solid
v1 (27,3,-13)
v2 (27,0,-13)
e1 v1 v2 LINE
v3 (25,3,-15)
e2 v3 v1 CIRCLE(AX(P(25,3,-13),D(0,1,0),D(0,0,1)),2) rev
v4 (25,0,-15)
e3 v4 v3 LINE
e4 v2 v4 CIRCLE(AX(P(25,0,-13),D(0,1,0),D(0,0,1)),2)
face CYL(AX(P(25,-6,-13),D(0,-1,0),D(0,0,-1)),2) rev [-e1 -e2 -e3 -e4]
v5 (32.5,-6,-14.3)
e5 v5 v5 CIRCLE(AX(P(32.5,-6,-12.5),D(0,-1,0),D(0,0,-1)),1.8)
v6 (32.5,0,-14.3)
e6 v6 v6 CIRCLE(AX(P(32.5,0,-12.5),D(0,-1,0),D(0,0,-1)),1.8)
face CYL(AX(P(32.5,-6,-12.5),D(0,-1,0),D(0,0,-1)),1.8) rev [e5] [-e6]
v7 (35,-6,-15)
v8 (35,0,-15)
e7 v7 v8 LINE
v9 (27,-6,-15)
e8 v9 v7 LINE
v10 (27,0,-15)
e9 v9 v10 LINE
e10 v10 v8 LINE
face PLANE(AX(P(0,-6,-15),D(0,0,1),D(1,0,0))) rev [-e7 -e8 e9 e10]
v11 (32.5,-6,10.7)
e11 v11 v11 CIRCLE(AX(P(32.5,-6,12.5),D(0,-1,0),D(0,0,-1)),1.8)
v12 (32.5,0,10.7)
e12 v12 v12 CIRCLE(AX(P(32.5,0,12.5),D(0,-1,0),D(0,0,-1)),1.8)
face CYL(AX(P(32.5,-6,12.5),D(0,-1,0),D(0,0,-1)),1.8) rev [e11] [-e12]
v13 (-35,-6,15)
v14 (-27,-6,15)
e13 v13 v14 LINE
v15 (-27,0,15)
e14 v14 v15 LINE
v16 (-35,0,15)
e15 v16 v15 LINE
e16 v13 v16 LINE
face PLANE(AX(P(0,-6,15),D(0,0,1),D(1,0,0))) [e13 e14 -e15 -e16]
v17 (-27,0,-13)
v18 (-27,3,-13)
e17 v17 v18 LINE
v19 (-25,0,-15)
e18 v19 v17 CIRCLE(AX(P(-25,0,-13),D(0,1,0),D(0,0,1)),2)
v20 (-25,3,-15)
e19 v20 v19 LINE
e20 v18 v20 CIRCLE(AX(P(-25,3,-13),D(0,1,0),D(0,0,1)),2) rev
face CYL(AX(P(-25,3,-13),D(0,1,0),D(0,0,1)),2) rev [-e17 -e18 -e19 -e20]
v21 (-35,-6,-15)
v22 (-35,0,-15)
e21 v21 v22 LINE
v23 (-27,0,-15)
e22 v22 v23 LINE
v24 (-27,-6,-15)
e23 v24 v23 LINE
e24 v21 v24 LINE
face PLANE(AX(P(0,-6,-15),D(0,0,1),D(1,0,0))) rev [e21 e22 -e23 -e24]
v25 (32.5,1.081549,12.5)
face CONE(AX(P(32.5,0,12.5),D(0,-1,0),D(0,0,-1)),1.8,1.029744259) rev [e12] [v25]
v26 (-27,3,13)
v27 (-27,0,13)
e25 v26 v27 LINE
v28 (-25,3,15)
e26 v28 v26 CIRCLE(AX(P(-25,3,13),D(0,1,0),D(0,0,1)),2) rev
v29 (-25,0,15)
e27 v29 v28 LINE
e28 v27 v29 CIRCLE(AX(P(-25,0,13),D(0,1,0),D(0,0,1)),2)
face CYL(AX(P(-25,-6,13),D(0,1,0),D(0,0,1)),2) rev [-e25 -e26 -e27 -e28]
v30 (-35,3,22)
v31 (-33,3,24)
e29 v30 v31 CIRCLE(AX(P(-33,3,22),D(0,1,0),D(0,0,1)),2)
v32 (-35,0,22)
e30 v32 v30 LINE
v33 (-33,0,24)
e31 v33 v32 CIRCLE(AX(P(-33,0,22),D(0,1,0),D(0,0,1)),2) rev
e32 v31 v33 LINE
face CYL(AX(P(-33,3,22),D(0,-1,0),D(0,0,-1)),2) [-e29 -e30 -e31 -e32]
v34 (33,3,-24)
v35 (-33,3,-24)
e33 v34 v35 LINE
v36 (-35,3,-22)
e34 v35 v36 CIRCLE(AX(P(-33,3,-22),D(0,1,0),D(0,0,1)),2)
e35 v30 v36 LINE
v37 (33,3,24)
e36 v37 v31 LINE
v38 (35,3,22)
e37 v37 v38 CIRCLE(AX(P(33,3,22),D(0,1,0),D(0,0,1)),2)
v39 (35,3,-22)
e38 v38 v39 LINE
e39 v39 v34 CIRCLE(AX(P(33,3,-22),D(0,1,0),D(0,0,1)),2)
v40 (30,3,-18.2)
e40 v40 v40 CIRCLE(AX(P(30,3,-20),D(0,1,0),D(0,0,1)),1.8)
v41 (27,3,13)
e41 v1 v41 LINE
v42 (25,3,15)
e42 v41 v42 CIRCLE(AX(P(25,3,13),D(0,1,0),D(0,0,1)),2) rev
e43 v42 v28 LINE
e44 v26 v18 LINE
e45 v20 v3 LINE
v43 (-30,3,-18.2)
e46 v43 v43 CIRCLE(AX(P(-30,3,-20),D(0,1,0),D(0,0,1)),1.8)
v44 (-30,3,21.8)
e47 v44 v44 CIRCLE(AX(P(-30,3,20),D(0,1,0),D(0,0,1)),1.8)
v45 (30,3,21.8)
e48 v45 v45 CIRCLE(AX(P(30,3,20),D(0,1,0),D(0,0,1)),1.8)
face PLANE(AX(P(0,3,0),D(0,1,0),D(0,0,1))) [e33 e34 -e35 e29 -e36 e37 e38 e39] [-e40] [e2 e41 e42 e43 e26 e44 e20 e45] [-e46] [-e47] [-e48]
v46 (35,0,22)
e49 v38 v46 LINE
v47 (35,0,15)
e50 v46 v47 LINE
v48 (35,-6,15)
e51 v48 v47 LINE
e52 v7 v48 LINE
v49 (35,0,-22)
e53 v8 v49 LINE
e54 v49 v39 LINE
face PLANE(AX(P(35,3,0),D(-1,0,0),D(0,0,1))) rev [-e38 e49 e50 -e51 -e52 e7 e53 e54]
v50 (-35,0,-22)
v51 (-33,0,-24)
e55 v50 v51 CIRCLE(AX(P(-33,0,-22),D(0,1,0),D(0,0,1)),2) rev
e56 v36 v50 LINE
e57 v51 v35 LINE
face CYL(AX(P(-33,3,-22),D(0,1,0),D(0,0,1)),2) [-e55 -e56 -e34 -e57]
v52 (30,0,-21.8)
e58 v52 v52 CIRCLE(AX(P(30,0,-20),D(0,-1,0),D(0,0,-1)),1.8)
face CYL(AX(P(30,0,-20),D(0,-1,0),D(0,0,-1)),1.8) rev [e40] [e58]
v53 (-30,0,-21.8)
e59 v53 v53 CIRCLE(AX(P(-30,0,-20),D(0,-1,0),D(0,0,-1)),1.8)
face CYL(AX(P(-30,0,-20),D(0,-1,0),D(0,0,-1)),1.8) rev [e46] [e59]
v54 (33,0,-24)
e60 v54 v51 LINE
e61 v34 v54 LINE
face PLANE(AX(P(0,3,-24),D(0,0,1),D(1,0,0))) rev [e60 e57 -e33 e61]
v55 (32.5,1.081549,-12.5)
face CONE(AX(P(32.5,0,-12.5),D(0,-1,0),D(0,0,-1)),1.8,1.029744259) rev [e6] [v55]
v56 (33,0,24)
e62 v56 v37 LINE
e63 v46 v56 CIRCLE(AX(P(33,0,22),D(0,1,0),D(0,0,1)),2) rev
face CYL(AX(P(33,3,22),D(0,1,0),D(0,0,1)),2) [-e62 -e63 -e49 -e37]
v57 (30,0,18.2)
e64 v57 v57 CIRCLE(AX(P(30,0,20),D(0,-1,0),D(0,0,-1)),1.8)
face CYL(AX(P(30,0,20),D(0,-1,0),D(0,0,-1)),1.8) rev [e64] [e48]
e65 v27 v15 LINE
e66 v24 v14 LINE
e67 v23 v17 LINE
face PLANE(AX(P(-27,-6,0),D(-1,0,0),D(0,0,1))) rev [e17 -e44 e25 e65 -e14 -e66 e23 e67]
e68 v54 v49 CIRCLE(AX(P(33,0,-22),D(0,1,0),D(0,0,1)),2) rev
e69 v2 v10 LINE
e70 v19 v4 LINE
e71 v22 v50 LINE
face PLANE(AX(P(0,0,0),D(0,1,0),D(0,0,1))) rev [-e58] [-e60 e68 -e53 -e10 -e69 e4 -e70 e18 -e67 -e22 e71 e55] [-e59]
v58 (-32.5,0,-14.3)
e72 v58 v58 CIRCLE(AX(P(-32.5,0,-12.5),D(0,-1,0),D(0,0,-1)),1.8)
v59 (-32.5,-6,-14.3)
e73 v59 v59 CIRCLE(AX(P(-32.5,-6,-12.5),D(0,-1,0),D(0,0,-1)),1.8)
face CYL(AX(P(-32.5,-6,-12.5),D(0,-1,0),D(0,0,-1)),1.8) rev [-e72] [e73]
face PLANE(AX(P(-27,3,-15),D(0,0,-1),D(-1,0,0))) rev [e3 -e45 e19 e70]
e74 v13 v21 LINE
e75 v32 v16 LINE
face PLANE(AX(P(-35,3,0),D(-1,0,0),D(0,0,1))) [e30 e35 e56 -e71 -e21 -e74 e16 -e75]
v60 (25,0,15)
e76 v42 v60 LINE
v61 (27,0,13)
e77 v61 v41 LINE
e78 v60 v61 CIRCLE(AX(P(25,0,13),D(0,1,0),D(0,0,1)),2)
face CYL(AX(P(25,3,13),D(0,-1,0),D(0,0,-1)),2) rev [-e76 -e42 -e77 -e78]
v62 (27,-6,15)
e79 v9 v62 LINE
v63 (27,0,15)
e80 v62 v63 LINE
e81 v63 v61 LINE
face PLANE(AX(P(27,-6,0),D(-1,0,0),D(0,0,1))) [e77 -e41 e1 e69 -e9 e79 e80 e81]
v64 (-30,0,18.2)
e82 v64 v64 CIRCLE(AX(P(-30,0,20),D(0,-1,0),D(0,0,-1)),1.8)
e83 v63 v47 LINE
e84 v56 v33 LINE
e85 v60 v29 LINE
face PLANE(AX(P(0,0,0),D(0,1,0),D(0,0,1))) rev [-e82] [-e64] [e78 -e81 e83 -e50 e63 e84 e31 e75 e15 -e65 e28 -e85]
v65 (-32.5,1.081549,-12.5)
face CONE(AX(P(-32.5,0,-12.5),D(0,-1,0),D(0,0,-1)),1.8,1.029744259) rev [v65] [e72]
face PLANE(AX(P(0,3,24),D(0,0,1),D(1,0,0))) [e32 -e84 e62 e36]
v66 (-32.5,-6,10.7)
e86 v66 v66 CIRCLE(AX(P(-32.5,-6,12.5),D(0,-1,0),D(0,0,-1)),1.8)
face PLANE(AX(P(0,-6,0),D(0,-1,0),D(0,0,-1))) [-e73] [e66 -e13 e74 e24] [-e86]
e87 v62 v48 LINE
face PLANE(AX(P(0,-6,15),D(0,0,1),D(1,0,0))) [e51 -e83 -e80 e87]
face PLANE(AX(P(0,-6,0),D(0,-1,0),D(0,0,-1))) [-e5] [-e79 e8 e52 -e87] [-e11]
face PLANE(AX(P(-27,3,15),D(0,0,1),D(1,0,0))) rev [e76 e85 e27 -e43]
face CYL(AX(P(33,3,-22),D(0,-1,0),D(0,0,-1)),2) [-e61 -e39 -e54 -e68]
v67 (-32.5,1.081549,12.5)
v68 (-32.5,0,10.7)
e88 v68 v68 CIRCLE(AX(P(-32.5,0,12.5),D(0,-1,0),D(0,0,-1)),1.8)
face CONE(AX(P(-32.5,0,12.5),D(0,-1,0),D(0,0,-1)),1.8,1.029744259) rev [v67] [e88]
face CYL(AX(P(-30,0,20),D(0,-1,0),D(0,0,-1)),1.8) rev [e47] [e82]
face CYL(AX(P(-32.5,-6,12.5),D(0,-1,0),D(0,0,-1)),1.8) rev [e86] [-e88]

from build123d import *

# Parameters (mm, degrees)
SKETCH1_W                = 70
SKETCH1_H                = 48
SKETCH1_W_2              = 60
SKETCH1_H_2              = 40
BOSS_EXTRUDE1_DEPTH      = 3
M3_CLEARANCE_HOLE1_D     = 3.6
M3_CLEARANCE_HOLE1_DEPTH = 9
M3_CLEARANCE_HOLE1_TIP   = 1.081549114
SKETCH6_W                = 8
SKETCH6_H                = 30
BOSS_EXTRUDE2_DEPTH      = 6
SKETCH7_W                = 54
SKETCH7_H                = 30
CUT_EXTRUDE1_DEPTH       = 43.860237983
FILLET1_R                = 2


# Read off the part's stored shape, not the designer's step: Ø1.0mm Dowel Hole1
with BuildPart() as part:
    # Sketch1 → Boss-Extrude1 (new body)
    # profile 1 of 2: a face of its own
    with BuildSketch(Plane(origin=(0, 0, 0), x_dir=(1, 0, 0), z_dir=(0, 1, 0))):
        Rectangle(SKETCH1_W, SKETCH1_H)
        Rectangle(SKETCH1_W_2, SKETCH1_H_2, mode=Mode.SUBTRACT)
    # profile 2 of 2: a face of its own
    with BuildSketch(Plane(origin=(0, 0, 0), x_dir=(1, 0, 0), z_dir=(0, 1, 0))):
        Rectangle(SKETCH1_W_2, SKETCH1_H_2)
    extrude(amount=BOSS_EXTRUDE1_DEPTH)

    # M3 Clearance Hole1
    with Locations(Plane(origin=(0, 0, 0), x_dir=(-1, 0, 0), z_dir=(0, -1, 0))):
        with Locations((30, -20), (30, 20), (-30, 20), (-30, -20)):
            Hole(M3_CLEARANCE_HOLE1_D / 2, depth=M3_CLEARANCE_HOLE1_DEPTH)
            with Locations((0, 0, -(M3_CLEARANCE_HOLE1_DEPTH + M3_CLEARANCE_HOLE1_TIP / 2))):  # 118° drill point
                Cone(0, M3_CLEARANCE_HOLE1_D / 2, M3_CLEARANCE_HOLE1_TIP, mode=Mode.SUBTRACT)

    # Sketch6 → Boss-Extrude2 (add)
    with BuildSketch(Plane.XZ):
        with Locations((-31, 0)):
            Rectangle(SKETCH6_W, SKETCH6_H)
        with Locations((31, 0)):
            Rectangle(SKETCH6_W, SKETCH6_H)
    extrude(amount=BOSS_EXTRUDE2_DEPTH)

    # Ø1.0mm Dowel Hole1 outline → Ø1.0mm Dowel Hole1 (revolve, cut)
    with BuildSketch(Plane(origin=(-32.5, 0, -12.5), x_dir=(1, 0, 0), z_dir=(0, 0, 1))):
        Polygon((1.8, 0), (0, 1.081549114), (0, -6), (1.8, -6), align=None)
    revolve(axis=Axis((-32.5, 0, -12.5), (0, 1, 0)), mode=Mode.SUBTRACT)

    # 1.0mm Dowel Hole1 2 outline → 1.0mm Dowel Hole1 2 (revolve, cut)
    with BuildSketch(Plane(origin=(32.5, 0, 12.5), x_dir=(1, 0, 0), z_dir=(0, 0, 1))):
        Polygon((1.8, 0), (0, 1.081549114), (0, -6), (1.8, -6), align=None)
    revolve(axis=Axis((32.5, 0, 12.5), (0, 1, 0)), mode=Mode.SUBTRACT)

    # 1.0mm Dowel Hole1 3 outline → 1.0mm Dowel Hole1 3 (revolve, cut)
    with BuildSketch(Plane(origin=(32.5, 0, -12.5), x_dir=(1, 0, 0), z_dir=(0, 0, 1))):
        Polygon((1.8, 0), (0, 1.081549114), (0, -6), (1.8, -6), align=None)
    revolve(axis=Axis((32.5, 0, -12.5), (0, 1, 0)), mode=Mode.SUBTRACT)

    # 1.0mm Dowel Hole1 4 outline → 1.0mm Dowel Hole1 4 (revolve, cut)
    with BuildSketch(Plane(origin=(-32.5, 0, 12.5), x_dir=(1, 0, 0), z_dir=(0, 0, 1))):
        Polygon((1.8, 0), (0, 1.081549114), (0, -6), (1.8, -6), align=None)
    revolve(axis=Axis((-32.5, 0, 12.5), (0, 1, 0)), mode=Mode.SUBTRACT)

    # 1.0mm Dowel Hole1 5 outline → 1.0mm Dowel Hole1 5 (revolve, cut)
    with BuildSketch(Plane.XY):
        Polygon((1.8, 0), (0, 1.081549114), (0, 0), align=None)
    revolve(axis=Axis((0, 0, 0), (0, 1, 0)), mode=Mode.SUBTRACT)

    # Sketch7 → Cut-Extrude1 (cut, through all)
    with BuildSketch(Plane.XZ):
        Rectangle(SKETCH7_W, SKETCH7_H)
    extrude(amount=-CUT_EXTRUDE1_DEPTH, mode=Mode.SUBTRACT)

    # Fillet1
    fillet1_edges = [part.edges().sort_by_distance(p)[0] for p in [
        (-27, 1.5, -15),
        (-27, 1.5, 15),
        (27, 1.5, 15),
        (27, 1.5, -15),
        (-35, 1.5, -24),
        (35, 1.5, -24),
        (35, 1.5, 24),
        (-35, 1.5, 24),
    ]]
    fillet(fillet1_edges, radius=FILLET1_R)


solid = part.part
